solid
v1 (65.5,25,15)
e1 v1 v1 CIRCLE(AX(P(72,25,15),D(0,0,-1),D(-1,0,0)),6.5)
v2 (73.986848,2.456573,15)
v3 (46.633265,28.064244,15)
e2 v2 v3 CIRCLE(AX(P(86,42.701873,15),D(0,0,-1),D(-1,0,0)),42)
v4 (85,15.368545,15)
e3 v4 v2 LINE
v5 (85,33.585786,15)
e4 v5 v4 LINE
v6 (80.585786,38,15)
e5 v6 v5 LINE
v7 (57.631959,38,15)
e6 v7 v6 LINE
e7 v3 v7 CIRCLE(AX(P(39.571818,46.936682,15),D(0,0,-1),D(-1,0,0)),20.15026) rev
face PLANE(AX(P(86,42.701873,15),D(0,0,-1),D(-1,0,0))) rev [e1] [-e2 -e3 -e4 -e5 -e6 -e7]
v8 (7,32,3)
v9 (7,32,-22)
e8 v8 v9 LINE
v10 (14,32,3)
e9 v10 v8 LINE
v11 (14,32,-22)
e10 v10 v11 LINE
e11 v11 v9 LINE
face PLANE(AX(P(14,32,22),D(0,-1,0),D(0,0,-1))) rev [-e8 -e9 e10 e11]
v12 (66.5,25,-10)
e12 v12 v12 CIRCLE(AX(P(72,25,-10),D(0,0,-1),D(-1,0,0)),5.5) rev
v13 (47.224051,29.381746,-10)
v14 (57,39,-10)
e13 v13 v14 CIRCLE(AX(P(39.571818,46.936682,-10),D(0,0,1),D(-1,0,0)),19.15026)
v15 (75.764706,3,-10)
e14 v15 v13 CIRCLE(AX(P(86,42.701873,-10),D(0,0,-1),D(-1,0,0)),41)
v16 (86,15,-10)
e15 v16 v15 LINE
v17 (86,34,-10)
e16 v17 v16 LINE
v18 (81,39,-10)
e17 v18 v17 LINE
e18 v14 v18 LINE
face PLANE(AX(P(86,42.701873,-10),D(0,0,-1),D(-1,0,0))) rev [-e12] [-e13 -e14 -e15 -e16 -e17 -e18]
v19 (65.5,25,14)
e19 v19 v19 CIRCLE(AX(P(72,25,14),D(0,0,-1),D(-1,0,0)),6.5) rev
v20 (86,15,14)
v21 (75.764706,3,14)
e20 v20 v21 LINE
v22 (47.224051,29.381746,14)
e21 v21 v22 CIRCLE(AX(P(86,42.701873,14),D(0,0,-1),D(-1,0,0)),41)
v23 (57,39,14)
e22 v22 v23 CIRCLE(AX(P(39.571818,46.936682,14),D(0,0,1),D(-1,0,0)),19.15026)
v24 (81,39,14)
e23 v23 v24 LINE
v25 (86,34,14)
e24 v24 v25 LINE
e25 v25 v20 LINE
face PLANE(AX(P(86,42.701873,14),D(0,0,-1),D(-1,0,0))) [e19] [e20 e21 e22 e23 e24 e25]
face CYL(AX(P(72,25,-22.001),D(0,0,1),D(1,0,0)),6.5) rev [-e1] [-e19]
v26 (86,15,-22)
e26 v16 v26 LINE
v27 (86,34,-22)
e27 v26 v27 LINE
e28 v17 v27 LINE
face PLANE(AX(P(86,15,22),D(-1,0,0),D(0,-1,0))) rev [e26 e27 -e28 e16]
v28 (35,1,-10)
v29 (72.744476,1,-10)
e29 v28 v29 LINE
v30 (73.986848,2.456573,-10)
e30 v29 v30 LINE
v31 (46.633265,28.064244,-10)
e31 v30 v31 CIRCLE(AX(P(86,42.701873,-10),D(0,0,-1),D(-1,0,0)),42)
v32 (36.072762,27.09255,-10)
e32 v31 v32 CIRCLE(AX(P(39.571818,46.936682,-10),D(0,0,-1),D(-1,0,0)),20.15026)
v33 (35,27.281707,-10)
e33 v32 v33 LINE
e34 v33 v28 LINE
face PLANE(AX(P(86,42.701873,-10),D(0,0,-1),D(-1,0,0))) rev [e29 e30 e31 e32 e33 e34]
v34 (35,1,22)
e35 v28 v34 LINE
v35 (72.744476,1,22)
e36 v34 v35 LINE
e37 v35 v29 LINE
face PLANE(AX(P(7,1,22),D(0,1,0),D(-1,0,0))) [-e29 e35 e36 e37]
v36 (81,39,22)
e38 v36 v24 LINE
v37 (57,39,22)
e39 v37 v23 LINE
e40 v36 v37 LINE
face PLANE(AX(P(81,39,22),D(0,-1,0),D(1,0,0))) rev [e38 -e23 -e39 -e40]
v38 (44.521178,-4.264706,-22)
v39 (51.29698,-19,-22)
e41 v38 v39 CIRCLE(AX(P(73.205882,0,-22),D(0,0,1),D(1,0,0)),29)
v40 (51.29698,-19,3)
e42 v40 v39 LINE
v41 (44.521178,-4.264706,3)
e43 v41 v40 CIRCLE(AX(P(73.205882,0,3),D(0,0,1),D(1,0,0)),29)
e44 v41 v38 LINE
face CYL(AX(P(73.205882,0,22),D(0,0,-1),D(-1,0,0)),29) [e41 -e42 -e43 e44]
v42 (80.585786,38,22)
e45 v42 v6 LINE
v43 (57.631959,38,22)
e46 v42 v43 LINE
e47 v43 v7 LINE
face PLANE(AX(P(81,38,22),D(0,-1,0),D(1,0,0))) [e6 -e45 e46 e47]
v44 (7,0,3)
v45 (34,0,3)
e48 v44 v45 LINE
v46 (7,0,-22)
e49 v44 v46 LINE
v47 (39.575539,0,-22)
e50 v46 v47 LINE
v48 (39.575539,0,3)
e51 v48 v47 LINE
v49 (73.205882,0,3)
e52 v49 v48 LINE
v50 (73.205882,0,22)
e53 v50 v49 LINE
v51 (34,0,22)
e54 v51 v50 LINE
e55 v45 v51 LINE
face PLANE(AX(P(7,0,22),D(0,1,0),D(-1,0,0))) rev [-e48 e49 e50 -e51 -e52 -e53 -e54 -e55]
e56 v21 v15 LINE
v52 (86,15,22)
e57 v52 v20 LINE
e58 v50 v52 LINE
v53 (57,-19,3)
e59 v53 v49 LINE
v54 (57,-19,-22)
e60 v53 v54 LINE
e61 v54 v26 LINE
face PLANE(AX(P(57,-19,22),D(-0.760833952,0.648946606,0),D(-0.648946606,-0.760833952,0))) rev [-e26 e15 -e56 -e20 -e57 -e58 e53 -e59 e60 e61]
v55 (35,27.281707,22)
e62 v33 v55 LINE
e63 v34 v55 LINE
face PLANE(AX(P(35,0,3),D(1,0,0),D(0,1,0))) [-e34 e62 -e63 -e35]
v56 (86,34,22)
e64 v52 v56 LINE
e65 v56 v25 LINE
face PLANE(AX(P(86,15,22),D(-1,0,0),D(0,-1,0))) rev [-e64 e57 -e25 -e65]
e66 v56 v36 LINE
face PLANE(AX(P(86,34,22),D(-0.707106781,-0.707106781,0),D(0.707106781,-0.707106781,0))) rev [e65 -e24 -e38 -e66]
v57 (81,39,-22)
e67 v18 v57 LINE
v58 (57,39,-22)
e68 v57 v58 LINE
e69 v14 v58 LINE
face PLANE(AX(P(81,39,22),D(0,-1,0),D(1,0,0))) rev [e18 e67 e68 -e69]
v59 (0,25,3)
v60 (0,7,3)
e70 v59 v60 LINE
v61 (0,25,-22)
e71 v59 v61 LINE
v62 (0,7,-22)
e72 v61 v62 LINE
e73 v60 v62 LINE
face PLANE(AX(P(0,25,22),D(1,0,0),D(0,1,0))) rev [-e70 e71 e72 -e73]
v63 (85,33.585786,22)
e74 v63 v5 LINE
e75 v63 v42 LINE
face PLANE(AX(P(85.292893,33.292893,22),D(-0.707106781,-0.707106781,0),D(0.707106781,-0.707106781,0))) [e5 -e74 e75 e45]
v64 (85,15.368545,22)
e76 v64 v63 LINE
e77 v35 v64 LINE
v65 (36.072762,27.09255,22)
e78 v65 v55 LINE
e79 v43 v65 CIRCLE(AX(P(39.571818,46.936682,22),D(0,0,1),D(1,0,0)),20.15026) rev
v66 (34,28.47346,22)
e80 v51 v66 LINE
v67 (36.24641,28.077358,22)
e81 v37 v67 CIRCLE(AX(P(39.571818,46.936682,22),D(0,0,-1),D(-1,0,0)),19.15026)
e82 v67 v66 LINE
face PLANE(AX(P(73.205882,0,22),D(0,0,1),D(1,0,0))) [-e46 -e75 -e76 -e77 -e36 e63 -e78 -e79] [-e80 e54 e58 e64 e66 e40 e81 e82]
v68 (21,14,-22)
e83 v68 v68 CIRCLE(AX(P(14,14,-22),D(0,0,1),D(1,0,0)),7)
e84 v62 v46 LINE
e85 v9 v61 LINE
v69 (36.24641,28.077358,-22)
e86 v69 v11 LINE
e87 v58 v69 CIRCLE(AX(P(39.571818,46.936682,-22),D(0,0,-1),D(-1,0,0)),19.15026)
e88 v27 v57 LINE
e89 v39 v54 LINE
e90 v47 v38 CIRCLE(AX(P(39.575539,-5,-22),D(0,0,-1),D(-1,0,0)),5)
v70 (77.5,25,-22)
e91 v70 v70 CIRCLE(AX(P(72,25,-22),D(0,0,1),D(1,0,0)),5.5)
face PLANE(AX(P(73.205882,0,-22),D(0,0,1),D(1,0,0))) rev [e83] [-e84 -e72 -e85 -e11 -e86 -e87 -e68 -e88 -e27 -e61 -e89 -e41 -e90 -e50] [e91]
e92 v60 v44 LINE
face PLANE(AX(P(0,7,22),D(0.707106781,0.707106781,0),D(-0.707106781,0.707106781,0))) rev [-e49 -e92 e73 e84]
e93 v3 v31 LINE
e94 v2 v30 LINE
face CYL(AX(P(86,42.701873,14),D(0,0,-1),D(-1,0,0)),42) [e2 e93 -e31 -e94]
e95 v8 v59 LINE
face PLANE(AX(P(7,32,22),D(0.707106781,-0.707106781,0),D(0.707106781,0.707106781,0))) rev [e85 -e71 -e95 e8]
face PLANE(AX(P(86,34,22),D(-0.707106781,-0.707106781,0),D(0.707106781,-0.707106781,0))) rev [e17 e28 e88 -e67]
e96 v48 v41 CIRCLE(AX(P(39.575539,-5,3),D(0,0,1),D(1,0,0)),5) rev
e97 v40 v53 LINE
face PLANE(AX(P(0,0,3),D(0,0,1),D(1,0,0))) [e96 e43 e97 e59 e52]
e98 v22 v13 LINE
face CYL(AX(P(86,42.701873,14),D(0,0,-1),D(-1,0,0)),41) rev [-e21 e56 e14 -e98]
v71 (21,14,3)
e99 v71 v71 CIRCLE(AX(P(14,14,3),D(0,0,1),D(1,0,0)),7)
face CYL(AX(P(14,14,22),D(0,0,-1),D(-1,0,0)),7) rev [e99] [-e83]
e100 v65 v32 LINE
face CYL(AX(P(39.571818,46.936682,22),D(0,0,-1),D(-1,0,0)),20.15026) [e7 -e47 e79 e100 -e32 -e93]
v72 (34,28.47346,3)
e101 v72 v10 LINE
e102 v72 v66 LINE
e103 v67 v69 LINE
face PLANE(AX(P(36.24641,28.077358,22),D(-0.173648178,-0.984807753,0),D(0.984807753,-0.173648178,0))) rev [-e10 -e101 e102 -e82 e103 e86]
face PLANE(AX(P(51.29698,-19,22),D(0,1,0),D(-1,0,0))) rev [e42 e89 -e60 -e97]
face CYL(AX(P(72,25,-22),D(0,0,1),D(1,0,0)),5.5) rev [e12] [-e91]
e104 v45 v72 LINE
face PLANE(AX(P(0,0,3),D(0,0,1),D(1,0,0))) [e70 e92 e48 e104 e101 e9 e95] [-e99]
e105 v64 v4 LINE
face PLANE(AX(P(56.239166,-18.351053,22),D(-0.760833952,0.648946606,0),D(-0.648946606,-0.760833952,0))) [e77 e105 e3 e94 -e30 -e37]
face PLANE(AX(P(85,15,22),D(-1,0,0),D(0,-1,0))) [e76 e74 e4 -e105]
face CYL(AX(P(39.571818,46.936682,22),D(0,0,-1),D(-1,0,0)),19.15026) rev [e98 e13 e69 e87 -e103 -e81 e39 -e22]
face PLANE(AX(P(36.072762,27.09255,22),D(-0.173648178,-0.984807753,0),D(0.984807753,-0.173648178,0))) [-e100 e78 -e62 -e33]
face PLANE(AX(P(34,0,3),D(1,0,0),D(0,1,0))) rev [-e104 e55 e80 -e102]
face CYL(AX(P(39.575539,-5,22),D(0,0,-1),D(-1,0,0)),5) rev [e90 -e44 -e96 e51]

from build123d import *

# Parameters (mm, degrees)
ESQUISSE2_R             = 7
BOSS_EXTRU_2_DEPTH      = 22
ENL_V_MAT_EXTRU_1_DEPTH = 19
ESQUISSE5_R             = 5.5
ENL_V_MAT_EXTRU_2_DEPTH = 105.177732746
ENL_V_START             = -36
ENL_V_MAT_EXTRU_3_DEPTH = 24
COQUE1_START            = 3
COQUE1_DEPTH            = 19
COQUE1_START_2          = 15
COQUE1_2_OUTLINE_R      = 6.5
COQUE1_2_DEPTH          = 7
ENL_V_MAT_EXTRU_4_REACH = 106.178
ESQUISSE16_R            = 6.5
ENL_V_START_2           = -13
ENL_V_MAT_EXTRU_5_DEPTH = 13


# Read off the part's stored shape, not the designer's step: Coque1
with BuildPart() as part:
    # Esquisse2 → Boss.-Extru.2 (new, symmetric)
    with BuildSketch(Plane.XY):
        with BuildLine():
            Line((51.296980053, -19), (57, -19))
            Line((57, -19), (86, 15))
            Line((86, 15), (86, 34))
            Line((86, 34), (81, 39))
            Line((81, 39), (57, 39))
            ThreePointArc((57, 39), (48.490791592, 29.99016727), (36.246410316, 28.077357637))
            Line((36.246410316, 28.077357637), (14, 32))
            Line((14, 32), (7, 32))
            Line((7, 32), (0, 25))
            Line((0, 25), (0, 7))
            Line((0, 7), (7, 0))
            Line((7, 0), (39.575538911, 0))
            ThreePointArc((39.575538911, 0), (42.840774692, -1.213413768), (44.521177653, -4.264705882))
            ThreePointArc((44.521177653, -4.264705882), (46.858007856, -12.115672061), (51.296980053, -19))
        make_face()
        with Locations((14, 14)):
            Circle(ESQUISSE2_R, mode=Mode.SUBTRACT)
    extrude(amount=BOSS_EXTRU_2_DEPTH, both=True)

    # Esquisse4 → Enlèv. mat.-Extru.1 (cut)
    with BuildSketch(Plane.XY.offset(22)):
        Polygon((34, 32), (0, 32), (0, -19), (86, -19), (86, 0), (34, 0), align=None)
    extrude(amount=-ENL_V_MAT_EXTRU_1_DEPTH, mode=Mode.SUBTRACT)

    # Esquisse5 → Enlèv. mat.-Extru.2 (cut, through all)
    with BuildSketch(Plane.XY.offset(22)):
        with Locations((72, 25)):
            Circle(ESQUISSE5_R)
    extrude(amount=-ENL_V_MAT_EXTRU_2_DEPTH, mode=Mode.SUBTRACT)

    # Esquisse14 → Enlèv. mat.-Extru.3 (cut)
    with BuildSketch(Plane(origin=(0, 0, -22), x_dir=(-1, 0, 0), z_dir=(0, 0, -1)).offset(ENL_V_START)):
        with BuildLine():
            Line((-75.764705882, 3), (-86, 15))
            Line((-86, 15), (-86, 34))
            Line((-86, 34), (-81, 39))
            Line((-81, 39), (-57, 39))
            ThreePointArc((-57, 39), (-53.002548038, 33.285750119), (-47.224051208, 29.381745985))
            ThreePointArc((-47.224051208, 29.381745985), (-58.169717695, 12.59414375), (-75.764705882, 3))
        make_face()
    extrude(amount=ENL_V_MAT_EXTRU_3_DEPTH, mode=Mode.SUBTRACT)

    # Coque1 outline → Coque1 (cut)
    with BuildSketch(Plane.XY.offset(COQUE1_START)):
        with BuildLine():
            Line((72.744476296, 1), (73.986847747, 2.456573425))
            ThreePointArc((73.986847747, 2.456573425), (57.296143365, 12.041008897), (46.63326541, 28.064243583))
            ThreePointArc((46.63326541, 28.064243583), (41.418086005, 26.871182604), (36.072762138, 27.092549884))
            Line((36.072762138, 27.092549884), (35, 27.281706793))
            Line((35, 27.281706793), (35, 1))
            Line((35, 1), (72.744476296, 1))
        make_face()
    extrude(amount=COQUE1_DEPTH, mode=Mode.SUBTRACT)

    # Coque1 2 outline → Coque1 2 (cut)
    with BuildSketch(Plane.XY.offset(COQUE1_START_2)):
        with BuildLine():
            Line((73.986847747, 2.456573425), (85, 15.368545033))
            Line((85, 15.368545033), (85, 33.585786438))
            Line((85, 33.585786438), (80.585786438, 38))
            Line((80.585786438, 38), (57.631958739, 38))
            ThreePointArc((57.631958739, 38), (53.079347815, 31.984103338), (46.63326541, 28.064243583))
            ThreePointArc((46.63326541, 28.064243583), (57.296143365, 12.041008897), (73.986847747, 2.456573425))
        make_face()
        with Locations((72, 25)):
            Circle(COQUE1_2_OUTLINE_R, mode=Mode.SUBTRACT)
    extrude(amount=COQUE1_2_DEPTH, mode=Mode.SUBTRACT)

    # Esquisse16 → Enlèv. mat.-Extru.4 (cut, up to next)
    with BuildSketch(Plane.XY.offset(22), mode=Mode.PRIVATE) as enl_v_mat_extru_4_sk1:
        with Locations(Location((72, 25, 0), (0, 0, 180))):
            Circle(ESQUISSE16_R)
    enl_v_mat_extru_4_tool1 = extrude(enl_v_mat_extru_4_sk1.sketch, amount=-ENL_V_MAT_EXTRU_4_REACH, mode=Mode.PRIVATE) & part.part
    add(enl_v_mat_extru_4_tool1.solids().sort_by_distance((72, 25, 22))[0], mode=Mode.SUBTRACT)

    # Esquisse17 → Enlèv. mat.-Extru.5 (cut)
    with BuildSketch(Plane.XY.offset(3).offset(ENL_V_START_2)):
        with BuildLine():
            Line((72.744476296, 1), (73.986847747, 2.456573425))
            ThreePointArc((73.986847747, 2.456573425), (57.296143365, 12.041008897), (46.63326541, 28.064243583))
            ThreePointArc((46.63326541, 28.064243583), (41.418086005, 26.871182604), (36.072762138, 27.092549884))
            Line((36.072762138, 27.092549884), (35, 27.281706793))
            Line((35, 27.281706793), (35, 1))
            Line((35, 1), (72.744476296, 1))
        make_face()
    extrude(amount=ENL_V_MAT_EXTRU_5_DEPTH, mode=Mode.SUBTRACT)


solid = part.part
